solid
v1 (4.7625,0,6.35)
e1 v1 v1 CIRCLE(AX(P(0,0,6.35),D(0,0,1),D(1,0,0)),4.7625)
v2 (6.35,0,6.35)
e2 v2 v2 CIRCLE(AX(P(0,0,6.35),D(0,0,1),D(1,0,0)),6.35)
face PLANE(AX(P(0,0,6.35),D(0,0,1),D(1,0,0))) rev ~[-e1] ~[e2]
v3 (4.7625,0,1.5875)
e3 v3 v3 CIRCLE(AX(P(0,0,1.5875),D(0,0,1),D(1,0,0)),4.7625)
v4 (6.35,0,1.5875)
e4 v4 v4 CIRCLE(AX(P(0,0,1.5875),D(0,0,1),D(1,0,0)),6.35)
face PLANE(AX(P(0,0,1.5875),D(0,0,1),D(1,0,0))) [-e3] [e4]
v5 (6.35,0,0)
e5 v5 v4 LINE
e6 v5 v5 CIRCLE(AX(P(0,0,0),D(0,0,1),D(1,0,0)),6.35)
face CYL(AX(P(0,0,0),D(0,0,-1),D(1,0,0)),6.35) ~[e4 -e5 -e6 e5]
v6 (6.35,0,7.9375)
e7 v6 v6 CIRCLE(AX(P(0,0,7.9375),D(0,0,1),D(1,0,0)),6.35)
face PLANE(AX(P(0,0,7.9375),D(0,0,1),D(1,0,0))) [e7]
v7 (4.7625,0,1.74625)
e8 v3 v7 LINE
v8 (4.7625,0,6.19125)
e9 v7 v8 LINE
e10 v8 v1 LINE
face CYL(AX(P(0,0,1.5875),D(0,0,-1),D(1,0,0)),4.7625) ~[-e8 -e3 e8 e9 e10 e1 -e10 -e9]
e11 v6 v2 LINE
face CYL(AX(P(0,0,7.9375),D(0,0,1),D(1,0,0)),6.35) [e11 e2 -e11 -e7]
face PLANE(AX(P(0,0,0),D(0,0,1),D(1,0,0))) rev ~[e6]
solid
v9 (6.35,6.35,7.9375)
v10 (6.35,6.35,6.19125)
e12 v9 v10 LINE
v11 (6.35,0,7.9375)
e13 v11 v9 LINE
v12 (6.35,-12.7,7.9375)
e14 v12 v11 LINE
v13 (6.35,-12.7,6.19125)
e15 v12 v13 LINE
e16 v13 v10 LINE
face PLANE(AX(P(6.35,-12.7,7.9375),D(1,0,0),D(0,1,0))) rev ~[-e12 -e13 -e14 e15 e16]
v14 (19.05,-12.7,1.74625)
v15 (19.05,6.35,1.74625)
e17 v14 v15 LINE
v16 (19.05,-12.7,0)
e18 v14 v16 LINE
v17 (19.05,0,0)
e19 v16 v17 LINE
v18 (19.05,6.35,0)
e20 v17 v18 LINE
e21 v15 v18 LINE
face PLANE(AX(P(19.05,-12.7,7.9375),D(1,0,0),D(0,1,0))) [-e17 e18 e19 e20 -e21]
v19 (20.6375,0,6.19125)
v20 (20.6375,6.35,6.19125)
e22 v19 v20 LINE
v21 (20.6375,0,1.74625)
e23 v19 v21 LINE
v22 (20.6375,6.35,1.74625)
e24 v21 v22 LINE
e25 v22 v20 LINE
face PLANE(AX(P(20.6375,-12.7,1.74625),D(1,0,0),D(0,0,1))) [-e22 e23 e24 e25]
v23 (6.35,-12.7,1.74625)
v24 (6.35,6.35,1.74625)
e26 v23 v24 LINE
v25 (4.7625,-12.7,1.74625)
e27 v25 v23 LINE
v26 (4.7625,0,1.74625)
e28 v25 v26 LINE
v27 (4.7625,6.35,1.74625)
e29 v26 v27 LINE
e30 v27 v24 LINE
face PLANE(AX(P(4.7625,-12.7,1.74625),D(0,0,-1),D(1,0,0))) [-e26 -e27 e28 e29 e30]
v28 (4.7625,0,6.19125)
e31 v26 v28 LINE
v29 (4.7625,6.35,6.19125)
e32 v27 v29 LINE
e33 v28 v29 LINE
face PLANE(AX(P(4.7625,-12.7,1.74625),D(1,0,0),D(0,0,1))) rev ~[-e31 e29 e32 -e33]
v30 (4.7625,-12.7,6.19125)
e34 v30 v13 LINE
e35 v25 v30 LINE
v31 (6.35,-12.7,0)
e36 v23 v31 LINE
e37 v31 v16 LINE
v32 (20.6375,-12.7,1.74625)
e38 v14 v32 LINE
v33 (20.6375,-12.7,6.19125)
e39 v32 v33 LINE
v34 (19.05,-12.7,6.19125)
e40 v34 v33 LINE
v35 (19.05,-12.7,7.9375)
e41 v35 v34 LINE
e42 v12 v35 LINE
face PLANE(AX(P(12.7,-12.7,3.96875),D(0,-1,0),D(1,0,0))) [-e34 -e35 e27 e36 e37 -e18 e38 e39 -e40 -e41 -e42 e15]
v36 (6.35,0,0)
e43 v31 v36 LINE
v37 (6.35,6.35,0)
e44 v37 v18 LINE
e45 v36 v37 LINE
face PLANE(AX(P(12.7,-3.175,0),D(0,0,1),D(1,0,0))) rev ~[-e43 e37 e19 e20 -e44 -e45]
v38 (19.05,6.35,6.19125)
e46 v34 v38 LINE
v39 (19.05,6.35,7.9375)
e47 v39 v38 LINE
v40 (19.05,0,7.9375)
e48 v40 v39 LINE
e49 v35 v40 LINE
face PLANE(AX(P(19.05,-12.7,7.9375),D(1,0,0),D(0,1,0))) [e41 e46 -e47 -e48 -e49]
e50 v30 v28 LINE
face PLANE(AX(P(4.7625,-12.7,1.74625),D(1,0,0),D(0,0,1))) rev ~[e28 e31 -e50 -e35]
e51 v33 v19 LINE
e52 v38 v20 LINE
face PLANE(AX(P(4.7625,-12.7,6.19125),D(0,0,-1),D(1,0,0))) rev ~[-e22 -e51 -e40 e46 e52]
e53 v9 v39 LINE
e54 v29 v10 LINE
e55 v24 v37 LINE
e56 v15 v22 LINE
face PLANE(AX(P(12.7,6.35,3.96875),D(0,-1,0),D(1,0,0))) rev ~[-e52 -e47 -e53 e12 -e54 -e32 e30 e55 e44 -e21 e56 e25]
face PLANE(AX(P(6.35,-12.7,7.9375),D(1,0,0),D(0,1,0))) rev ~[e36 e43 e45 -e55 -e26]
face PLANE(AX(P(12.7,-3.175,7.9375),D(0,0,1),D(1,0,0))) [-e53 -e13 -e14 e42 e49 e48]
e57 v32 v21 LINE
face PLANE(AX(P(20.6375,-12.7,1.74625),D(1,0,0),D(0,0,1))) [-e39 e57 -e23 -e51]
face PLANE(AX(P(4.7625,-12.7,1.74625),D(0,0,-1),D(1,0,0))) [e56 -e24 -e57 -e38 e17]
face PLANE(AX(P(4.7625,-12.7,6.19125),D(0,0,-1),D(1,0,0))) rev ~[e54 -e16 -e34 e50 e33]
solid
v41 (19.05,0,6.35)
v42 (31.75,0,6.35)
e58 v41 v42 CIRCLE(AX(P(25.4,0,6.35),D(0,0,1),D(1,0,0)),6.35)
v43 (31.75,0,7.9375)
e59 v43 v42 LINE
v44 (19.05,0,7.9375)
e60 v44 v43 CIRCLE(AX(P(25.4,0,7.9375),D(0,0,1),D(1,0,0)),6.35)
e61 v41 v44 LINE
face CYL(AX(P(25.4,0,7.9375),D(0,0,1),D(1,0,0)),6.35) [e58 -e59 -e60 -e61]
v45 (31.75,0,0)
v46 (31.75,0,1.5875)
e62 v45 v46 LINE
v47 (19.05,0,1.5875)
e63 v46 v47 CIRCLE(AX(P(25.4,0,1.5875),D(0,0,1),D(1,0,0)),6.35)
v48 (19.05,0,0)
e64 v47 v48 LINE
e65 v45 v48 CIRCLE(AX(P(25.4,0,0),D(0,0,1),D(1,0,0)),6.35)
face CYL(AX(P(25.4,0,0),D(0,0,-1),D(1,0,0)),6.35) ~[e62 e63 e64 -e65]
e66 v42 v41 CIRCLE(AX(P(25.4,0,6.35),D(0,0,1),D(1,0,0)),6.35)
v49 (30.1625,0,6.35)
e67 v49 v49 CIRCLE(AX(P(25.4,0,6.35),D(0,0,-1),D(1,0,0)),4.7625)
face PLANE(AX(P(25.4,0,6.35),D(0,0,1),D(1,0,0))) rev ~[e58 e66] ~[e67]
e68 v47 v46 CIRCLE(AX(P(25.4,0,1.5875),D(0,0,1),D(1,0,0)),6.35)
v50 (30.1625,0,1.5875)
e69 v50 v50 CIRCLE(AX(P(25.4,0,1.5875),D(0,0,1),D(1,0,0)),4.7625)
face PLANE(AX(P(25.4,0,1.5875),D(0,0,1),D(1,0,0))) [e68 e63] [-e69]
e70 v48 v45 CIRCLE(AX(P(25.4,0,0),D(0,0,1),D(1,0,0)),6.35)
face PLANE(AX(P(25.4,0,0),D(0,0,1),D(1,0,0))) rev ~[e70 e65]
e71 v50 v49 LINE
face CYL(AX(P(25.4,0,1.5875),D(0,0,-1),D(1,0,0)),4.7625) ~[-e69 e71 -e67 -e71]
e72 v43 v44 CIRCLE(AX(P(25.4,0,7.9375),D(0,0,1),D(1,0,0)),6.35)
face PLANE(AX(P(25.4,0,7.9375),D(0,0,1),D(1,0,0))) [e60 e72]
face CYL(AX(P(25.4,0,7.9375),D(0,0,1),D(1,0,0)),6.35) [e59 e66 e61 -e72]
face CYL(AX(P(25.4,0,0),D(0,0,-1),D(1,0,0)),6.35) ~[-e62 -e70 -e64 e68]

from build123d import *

# Parameters (mm, degrees)
F0_R     = 6.35
F1_DEPTH = 1.5875
F2_R     = 4.7625
F3_DEPTH = 6.35
F4_R     = 6.35
F4_R_2   = 4.7625
F5_DEPTH = 1.5875
F6_W     = 12.7
F6_H     = 19.05
F7_DEPTH = 7.9375
F8_W     = 15.875
F8_H     = 4.445
F9_DEPTH = 19.05


# Not quite as in the source:
# - a feature names something its author has since deleted; it is built from what else it names


with BuildPart() as f1:
    # F0 (on Top) → F1 (new body)
    with BuildSketch(Plane.XY):
        with Locations((25.4, 0)):
            Circle(F0_R)
    extrude(amount=F1_DEPTH)

    # F2 (on face) → F3, piece 2 (join)
    with BuildSketch(Plane.XY.offset(1.5875)):
        with Locations((25.4, 0)):
            Circle(F2_R)
    extrude(amount=F3_DEPTH)

    # F4 (on face) → F5, piece 2 (join)
    with BuildSketch(Plane.XY.offset(7.9375)):
        with Locations((25.4, 0)):
            Circle(F4_R)
    extrude(amount=-F5_DEPTH)



with BuildPart() as f1b:
    # F0 (on Top) → F1, piece 2 (new body)
    with BuildSketch(Plane.XY):
        Circle(F0_R)
    extrude(amount=F1_DEPTH)

    # F2 (on face) → F3 (join)
    with BuildSketch(Plane.XY.offset(1.5875)):
        Circle(F2_R)
    extrude(amount=F3_DEPTH)

    # F4 (on face) → F5 (join)
    with BuildSketch(Plane.XY.offset(7.9375)):
        Circle(F4_R)
        Circle(F4_R_2, mode=Mode.SUBTRACT)
    extrude(amount=-F5_DEPTH)


with BuildPart() as f7:
    # F6 (on face) → F7 (new body, through all)
    with BuildSketch(Plane.XY.offset(7.9375)):
        with Locations((12.7, -3.175)):
            Rectangle(F6_W, F6_H)
    extrude(amount=-F7_DEPTH)


with BuildPart() as f1_1:
    add(f1.part)

    add(f1b.part)  # F9 merges F1b

    add(f7.part)  # F9 merges F7
    # F8 (on face) → F9 (join, through all)
    with BuildSketch(Plane.XZ.offset(12.7)):
        with Locations((12.7, 3.96875)):
            Rectangle(F8_W, F8_H)
    extrude(amount=-F9_DEPTH)


solid = f1_1.part
